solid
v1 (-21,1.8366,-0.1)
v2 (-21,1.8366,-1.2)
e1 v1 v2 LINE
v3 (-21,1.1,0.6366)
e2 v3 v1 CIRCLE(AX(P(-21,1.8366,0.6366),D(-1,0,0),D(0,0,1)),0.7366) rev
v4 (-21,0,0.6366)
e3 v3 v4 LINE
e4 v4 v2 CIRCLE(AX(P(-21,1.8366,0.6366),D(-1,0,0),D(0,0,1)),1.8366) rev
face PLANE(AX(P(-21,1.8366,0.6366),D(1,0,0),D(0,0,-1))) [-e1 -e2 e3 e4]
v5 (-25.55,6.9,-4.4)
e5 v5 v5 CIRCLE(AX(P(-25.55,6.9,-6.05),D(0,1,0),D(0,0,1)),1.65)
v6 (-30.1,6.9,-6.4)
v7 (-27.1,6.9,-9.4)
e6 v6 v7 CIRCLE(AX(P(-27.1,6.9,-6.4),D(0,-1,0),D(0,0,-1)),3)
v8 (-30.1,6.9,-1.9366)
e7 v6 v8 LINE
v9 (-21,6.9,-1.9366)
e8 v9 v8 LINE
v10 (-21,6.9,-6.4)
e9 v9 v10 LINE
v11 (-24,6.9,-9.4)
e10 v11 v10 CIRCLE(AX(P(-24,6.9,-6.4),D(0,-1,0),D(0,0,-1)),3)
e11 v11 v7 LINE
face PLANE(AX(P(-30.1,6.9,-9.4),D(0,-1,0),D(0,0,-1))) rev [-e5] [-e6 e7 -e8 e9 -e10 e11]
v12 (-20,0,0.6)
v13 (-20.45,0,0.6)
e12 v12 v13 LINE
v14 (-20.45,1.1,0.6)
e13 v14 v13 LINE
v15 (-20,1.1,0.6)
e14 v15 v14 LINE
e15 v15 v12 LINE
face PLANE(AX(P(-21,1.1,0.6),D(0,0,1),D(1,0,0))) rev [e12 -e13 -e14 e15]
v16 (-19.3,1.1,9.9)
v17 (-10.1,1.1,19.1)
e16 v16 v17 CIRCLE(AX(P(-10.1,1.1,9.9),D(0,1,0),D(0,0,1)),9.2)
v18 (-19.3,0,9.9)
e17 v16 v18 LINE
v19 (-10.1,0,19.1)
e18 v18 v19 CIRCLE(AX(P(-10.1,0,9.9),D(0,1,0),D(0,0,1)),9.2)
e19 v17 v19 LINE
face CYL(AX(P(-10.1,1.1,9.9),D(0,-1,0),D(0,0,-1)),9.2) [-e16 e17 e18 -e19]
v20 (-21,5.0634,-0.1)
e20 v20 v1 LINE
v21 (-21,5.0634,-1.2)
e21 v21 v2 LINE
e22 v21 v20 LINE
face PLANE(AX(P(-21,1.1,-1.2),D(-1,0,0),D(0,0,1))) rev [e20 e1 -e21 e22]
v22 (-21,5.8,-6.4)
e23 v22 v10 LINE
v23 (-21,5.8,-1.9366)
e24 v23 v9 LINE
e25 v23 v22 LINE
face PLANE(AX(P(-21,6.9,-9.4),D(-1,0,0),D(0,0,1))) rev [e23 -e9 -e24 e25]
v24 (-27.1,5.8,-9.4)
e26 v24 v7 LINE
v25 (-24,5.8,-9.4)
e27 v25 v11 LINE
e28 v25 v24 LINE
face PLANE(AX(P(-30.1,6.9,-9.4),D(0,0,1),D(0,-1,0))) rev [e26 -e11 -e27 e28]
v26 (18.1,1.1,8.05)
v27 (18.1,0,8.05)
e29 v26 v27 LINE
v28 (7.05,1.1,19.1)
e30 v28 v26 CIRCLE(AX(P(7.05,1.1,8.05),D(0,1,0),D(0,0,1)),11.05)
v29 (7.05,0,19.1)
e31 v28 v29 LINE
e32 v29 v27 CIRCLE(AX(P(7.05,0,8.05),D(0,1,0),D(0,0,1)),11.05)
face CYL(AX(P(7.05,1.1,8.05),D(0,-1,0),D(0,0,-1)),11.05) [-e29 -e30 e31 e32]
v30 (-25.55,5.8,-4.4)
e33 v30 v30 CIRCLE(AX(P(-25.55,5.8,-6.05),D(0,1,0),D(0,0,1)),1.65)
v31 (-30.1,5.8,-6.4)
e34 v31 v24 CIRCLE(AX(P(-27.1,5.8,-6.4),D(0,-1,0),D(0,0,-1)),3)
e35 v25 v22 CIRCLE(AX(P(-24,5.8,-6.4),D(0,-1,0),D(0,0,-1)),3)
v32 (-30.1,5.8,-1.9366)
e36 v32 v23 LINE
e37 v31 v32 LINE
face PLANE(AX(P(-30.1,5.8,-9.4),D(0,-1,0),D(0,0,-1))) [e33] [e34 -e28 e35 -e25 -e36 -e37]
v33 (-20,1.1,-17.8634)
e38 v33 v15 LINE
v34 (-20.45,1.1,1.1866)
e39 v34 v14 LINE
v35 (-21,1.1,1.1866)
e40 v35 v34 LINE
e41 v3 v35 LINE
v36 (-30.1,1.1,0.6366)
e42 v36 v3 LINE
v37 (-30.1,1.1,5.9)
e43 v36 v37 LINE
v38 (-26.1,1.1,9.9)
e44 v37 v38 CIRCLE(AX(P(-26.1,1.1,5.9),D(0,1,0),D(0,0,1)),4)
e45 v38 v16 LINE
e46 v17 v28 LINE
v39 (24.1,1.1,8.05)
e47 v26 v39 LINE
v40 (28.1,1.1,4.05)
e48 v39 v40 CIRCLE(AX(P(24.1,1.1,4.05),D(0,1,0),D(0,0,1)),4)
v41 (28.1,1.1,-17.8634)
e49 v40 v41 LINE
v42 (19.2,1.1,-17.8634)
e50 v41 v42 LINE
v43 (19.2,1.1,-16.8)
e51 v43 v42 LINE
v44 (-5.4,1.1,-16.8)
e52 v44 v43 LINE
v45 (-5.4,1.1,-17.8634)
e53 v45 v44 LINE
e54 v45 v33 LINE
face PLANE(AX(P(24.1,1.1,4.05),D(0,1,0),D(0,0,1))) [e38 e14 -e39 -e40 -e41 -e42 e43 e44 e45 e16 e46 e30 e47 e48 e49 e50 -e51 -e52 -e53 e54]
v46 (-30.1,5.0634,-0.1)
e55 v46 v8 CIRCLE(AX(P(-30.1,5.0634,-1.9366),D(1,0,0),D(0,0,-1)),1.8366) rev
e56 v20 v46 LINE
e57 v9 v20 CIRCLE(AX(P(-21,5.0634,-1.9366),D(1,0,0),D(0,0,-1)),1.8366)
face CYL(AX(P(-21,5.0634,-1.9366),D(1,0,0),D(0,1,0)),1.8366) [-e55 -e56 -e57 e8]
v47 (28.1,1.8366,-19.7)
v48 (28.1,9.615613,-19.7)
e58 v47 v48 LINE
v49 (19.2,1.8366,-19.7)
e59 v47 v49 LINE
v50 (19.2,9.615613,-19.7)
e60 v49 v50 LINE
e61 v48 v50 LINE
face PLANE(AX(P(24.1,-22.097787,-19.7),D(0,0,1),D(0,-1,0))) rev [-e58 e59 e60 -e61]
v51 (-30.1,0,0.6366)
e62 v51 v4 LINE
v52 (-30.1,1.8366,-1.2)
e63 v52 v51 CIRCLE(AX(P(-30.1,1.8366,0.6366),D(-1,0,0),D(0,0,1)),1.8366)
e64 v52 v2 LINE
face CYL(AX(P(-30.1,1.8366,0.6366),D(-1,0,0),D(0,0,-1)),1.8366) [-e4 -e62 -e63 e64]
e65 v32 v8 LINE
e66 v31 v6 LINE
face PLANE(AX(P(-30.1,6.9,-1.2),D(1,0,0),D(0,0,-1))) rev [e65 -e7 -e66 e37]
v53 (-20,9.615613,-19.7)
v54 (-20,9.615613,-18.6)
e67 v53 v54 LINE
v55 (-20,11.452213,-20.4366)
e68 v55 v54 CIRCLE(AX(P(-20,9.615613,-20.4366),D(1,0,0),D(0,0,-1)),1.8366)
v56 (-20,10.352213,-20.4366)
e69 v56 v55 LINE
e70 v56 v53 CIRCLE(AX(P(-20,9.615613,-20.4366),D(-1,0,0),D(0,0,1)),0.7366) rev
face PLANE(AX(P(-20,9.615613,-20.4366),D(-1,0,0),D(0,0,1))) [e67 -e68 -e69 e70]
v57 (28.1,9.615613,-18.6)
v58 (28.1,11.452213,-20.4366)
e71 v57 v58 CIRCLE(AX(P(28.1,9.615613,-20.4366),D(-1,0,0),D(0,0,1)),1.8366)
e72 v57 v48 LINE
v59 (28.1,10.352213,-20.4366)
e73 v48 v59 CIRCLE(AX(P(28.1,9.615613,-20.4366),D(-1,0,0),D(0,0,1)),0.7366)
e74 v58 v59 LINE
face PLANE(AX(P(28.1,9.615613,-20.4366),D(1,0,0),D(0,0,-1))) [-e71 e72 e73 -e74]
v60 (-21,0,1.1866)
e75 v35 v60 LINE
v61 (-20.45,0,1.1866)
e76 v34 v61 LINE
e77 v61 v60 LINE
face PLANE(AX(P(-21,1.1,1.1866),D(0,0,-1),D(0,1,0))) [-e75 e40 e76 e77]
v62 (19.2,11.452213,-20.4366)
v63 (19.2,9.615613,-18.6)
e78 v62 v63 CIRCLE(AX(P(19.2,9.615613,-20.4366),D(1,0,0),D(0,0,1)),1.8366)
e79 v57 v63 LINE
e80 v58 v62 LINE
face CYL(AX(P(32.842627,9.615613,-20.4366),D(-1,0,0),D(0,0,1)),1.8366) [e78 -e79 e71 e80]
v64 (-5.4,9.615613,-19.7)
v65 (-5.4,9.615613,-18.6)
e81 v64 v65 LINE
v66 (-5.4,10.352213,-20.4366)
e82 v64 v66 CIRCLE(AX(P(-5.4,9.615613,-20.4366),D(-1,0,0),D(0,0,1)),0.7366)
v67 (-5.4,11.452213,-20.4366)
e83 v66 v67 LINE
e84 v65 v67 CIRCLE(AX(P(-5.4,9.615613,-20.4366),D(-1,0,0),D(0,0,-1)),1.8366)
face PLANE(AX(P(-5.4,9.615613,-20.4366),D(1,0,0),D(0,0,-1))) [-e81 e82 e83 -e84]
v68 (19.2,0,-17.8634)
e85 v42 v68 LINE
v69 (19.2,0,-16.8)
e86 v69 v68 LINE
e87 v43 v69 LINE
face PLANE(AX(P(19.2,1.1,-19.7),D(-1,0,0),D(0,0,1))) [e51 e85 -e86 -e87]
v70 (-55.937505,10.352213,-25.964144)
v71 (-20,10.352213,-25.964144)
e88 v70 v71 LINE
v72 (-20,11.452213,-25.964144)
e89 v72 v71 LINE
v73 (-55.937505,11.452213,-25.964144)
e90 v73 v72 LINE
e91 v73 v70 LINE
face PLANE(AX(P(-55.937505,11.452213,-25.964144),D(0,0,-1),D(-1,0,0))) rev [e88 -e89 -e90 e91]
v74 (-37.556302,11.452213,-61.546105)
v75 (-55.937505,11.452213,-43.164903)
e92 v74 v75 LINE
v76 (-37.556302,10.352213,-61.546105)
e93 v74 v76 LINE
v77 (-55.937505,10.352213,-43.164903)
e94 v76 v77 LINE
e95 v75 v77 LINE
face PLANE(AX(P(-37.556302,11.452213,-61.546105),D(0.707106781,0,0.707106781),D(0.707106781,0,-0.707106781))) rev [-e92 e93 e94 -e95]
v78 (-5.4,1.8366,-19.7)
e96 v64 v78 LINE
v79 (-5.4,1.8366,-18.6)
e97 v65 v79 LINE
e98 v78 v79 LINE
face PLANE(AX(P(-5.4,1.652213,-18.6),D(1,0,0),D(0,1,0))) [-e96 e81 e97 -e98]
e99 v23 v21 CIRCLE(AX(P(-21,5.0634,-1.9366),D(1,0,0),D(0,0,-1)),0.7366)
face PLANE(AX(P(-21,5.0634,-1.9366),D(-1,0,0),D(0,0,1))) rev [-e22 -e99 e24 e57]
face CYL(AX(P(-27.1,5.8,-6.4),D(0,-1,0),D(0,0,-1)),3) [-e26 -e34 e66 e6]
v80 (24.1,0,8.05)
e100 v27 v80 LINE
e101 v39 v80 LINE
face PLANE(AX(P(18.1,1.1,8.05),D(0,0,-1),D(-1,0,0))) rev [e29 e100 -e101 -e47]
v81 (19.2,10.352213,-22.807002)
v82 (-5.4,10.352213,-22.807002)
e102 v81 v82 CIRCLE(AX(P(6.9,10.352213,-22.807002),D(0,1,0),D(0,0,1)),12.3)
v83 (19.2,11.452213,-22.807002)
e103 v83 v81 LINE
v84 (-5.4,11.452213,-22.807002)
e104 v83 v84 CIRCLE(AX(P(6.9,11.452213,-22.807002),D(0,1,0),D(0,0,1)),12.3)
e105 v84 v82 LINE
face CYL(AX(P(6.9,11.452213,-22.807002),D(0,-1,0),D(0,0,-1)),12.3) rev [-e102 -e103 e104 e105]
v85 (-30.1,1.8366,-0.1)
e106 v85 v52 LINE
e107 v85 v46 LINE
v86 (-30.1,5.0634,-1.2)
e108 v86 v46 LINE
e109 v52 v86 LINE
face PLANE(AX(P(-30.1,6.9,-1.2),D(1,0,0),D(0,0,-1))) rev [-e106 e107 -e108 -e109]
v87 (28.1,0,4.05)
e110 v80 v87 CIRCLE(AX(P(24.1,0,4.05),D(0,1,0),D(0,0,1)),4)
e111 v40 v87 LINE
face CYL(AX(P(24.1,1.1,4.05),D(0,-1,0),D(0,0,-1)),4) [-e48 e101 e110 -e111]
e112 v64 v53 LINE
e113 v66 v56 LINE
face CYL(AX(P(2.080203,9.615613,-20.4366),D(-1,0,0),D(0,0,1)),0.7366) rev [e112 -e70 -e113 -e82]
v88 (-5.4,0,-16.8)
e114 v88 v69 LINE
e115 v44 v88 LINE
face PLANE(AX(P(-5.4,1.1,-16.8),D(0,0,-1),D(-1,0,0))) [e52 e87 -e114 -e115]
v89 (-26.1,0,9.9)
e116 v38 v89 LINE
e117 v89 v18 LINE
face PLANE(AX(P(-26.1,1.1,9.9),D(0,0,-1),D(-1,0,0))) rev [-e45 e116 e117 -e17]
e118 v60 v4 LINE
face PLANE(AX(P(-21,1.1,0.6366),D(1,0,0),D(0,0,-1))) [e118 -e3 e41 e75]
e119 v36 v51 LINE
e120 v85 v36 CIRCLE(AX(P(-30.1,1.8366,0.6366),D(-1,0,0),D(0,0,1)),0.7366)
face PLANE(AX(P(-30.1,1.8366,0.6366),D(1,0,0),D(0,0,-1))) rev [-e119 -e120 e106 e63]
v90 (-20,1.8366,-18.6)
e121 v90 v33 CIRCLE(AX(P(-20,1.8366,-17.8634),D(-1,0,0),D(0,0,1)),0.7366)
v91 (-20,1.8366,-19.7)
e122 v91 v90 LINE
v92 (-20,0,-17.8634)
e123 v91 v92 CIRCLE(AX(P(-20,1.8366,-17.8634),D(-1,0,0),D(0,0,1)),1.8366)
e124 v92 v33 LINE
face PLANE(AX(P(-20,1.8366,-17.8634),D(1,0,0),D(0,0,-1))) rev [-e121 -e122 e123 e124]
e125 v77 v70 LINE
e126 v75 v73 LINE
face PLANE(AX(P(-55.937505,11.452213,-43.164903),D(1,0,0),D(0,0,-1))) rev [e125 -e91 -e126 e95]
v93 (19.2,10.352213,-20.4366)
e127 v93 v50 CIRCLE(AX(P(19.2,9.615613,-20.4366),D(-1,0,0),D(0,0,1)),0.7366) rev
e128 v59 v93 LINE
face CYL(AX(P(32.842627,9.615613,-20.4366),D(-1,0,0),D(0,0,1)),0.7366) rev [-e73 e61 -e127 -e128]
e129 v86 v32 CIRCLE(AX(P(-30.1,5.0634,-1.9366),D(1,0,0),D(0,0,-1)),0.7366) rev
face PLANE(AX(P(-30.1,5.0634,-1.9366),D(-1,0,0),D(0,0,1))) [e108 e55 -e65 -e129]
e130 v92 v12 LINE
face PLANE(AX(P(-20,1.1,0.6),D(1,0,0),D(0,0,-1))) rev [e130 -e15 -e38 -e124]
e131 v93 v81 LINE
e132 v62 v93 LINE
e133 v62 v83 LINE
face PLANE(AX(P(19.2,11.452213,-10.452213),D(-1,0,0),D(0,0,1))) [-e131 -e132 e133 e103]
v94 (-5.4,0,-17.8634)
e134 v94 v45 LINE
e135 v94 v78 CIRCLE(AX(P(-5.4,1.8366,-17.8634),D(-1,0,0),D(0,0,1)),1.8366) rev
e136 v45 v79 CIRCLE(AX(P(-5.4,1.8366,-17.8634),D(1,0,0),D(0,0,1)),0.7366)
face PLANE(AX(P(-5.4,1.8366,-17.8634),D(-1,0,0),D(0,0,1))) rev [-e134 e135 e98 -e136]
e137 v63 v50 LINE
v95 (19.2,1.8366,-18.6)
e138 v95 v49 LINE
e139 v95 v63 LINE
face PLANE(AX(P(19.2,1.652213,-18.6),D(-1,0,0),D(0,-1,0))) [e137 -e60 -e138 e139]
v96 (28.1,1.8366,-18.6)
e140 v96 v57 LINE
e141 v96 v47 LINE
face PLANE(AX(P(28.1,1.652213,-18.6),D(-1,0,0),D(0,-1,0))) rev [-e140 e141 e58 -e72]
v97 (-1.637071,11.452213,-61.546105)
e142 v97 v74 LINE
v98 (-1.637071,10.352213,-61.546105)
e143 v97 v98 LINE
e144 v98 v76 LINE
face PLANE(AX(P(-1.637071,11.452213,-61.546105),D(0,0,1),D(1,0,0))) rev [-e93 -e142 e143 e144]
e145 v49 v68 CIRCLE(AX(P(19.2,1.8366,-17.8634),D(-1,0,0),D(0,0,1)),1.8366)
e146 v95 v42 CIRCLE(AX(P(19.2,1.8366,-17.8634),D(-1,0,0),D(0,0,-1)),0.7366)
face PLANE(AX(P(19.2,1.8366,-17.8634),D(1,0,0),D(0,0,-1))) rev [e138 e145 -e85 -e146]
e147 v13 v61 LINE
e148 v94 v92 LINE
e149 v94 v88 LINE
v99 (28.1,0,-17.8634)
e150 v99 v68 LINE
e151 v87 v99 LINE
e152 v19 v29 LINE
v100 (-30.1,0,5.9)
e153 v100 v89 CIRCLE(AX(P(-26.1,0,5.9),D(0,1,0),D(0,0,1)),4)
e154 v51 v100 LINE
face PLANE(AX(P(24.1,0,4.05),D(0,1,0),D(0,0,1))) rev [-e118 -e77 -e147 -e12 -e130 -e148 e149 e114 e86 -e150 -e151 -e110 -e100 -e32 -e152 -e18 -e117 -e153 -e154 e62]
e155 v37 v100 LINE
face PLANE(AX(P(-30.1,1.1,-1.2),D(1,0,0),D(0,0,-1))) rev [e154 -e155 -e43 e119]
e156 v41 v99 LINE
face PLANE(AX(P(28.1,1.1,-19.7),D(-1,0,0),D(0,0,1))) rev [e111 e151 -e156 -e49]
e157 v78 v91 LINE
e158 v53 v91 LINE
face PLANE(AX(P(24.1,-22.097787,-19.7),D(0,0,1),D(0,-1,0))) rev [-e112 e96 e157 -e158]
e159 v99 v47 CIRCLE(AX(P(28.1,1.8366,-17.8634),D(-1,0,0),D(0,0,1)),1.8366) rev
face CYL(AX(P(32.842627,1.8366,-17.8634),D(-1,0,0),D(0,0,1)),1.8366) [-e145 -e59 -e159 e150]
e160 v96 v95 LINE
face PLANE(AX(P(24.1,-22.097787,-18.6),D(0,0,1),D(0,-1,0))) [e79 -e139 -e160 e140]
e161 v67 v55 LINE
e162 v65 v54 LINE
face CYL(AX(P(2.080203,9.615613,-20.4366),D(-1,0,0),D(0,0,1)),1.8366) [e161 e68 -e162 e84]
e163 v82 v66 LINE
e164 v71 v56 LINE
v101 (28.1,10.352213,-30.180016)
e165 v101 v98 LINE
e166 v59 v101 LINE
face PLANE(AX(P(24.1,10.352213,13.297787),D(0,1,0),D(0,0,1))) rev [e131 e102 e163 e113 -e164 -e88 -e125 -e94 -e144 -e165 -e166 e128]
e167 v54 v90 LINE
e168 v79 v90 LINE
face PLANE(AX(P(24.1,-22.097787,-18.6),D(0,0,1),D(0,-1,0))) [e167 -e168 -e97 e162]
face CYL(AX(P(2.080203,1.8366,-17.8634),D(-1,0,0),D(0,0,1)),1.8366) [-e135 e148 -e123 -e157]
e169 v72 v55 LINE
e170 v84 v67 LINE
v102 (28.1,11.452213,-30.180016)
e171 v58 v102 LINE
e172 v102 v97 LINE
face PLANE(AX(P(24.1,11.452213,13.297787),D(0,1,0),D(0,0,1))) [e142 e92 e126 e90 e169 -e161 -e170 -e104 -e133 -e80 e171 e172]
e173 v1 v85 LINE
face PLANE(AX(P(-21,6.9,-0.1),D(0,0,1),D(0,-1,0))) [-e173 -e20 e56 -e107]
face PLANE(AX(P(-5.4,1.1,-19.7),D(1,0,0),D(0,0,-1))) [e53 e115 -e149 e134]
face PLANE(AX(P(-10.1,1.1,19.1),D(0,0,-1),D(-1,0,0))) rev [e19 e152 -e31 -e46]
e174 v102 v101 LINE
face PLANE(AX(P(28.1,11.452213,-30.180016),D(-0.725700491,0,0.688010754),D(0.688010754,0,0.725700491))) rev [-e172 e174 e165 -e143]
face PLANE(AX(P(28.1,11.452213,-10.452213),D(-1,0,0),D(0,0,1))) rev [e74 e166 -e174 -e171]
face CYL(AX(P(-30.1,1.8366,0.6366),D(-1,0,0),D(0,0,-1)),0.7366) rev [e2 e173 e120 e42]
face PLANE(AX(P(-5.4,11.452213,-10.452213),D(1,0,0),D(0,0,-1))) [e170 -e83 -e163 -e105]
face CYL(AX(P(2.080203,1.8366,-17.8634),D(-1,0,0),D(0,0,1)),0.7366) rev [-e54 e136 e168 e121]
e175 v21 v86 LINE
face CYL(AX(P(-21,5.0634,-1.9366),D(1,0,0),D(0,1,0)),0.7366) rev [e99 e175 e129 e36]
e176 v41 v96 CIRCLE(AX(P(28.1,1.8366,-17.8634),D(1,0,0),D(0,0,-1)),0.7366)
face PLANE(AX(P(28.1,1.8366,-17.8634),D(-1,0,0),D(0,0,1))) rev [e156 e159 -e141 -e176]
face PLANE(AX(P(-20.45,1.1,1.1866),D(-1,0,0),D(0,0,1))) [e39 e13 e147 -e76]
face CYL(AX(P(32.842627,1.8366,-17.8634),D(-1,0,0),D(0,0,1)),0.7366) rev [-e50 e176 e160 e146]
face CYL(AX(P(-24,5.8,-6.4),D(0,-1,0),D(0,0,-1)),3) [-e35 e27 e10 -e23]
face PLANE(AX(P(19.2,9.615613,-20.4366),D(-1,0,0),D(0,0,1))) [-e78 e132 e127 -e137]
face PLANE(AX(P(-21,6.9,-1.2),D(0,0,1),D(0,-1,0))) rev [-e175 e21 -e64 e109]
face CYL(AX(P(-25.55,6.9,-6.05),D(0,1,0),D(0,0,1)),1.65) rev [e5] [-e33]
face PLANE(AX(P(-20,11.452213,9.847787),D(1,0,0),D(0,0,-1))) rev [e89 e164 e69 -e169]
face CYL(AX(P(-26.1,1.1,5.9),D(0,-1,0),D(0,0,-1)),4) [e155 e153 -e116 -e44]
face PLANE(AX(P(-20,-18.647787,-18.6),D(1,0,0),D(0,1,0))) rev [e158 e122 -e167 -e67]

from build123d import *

# Parameters (mm, degrees)
BASE_FLANGE1_DEPTH            = 1.1
EDGE_FLANGE1_STRIP_W          = 5.8732
EDGE_FLANGE1_STRIP_H          = 1.1
EDGE_FLANGE1_STRIP_CUT_DEPTH  = 9.1
EDGE_FLANGE1_RELIEF_W         = 6.4232
EDGE_FLANGE1_RELIEF_H         = 0.55
EDGE_FLANGE1_RELIEF_CUT_DEPTH = 1.1
EDGE_FLANGE1_DEPTH            = 9.1
EDGE_FLANGE2_STRIP_W          = 5.8732
EDGE_FLANGE2_STRIP_H          = 1.1
EDGE_FLANGE2_STRIP_CUT_DEPTH  = 9.1
EDGE_FLANGE2_DEPTH            = 9.1
SKETCH9_R                     = 1.65
EXTRUDE1_DEPTH                = 1.1
SKETCHED_START                = -55.937504649
SKETCHED_BEND2_DEPTH          = 84.037504649
SKETCHED_START_2              = -37.556301802
SKETCHED_BEND2_2_OUTLINE_W    = 35.581961475
SKETCHED_BEND2_2_OUTLINE_H    = 1.1
SKETCHED_BEND2_2_DEPTH        = 32.156301802
SKETCHED_START_3              = -20
SKETCHED_BEND2_3_DEPTH        = 14.6
SKETCHED_START_4              = 19.2
SKETCHED_BEND2_4_DEPTH        = 8.9
SKETCHED_START_5              = -19.700000012
SKETCHED_BEND2_5_DEPTH        = 1.100000011
SKETCHED_BEND5_DEPTH          = 84.037504649
SKETCHED_BEND5_2_OUTLINE_W    = 1.1
SKETCHED_BEND5_2_OUTLINE_H    = 35.581961474
SKETCHED_BEND5_2_DEPTH        = 32.156301802
SKETCHED_BEND5_3_DEPTH        = 14.6
SKETCHED_BEND5_4_DEPTH        = 8.9
SKETCHED_START_6              = 10.352213433
SKETCHED_BEND5_5_DEPTH        = 1.1


with BuildPart() as part:
    # Base-Flange1: sheet metal written as solids
    # Sketch1 → Base-Flange1 (new body)
    with BuildSketch(Plane(origin=(0, 0, 0), x_dir=(1, 0, 0), z_dir=(0, 1, 0))):
        with BuildLine():
            Line((-30.1, 1.2), (-21, 1.2))
            Line((-21, 1.2), (-21, -0.6))
            Line((-21, -0.6), (-20, -0.6))
            Line((-20, -0.6), (-20, 19.7))
            Line((-20, 19.7), (-20, 32.054788892))
            Line((-20, 32.054788892), (-20, 35.211930536))
            Line((-20, 35.211930536), (-55.937504649, 35.211930536))
            Line((-55.937504649, 35.211930536), (-55.937504649, 52.412689164))
            Line((-55.937504649, 52.412689164), (-37.556301802, 70.793892011))
            Line((-37.556301802, 70.793892011), (-1.637070551, 70.793892011))
            Line((-1.637070551, 70.793892011), (28.1, 39.427802749))
            Line((28.1, 39.427802749), (28.1, 32.054788892))
            Line((28.1, 32.054788892), (28.1, 19.7))
            Line((28.1, 19.7), (28.1, -4.05))
            ThreePointArc((28.1, -4.05), (26.928427125, -6.878427125), (24.1, -8.05))
            Line((24.1, -8.05), (18.1, -8.05))
            ThreePointArc((18.1, -8.05), (14.863529932, -15.863529932), (7.05, -19.1))
            Line((7.05, -19.1), (-10.1, -19.1))
            ThreePointArc((-10.1, -19.1), (-16.605382387, -16.405382387), (-19.3, -9.9))
            Line((-19.3, -9.9), (-26.1, -9.9))
            ThreePointArc((-26.1, -9.9), (-28.928427125, -8.728427125), (-30.1, -5.9))
            Line((-30.1, -5.9), (-30.1, 1.2))
        make_face()
        with BuildLine():
            Line((-5.4, 19.7), (-5.4, 16.8))
            Line((-5.4, 16.8), (19.2, 16.8))
            Line((19.2, 16.8), (19.2, 19.7))
            Line((19.2, 19.7), (19.2, 32.054788892))
            ThreePointArc((19.2, 32.054788892), (6.9, 44.354788892), (-5.4, 32.054788892))
            Line((-5.4, 32.054788892), (-5.4, 19.7))
        make_face(mode=Mode.SUBTRACT)
    extrude(amount=BASE_FLANGE1_DEPTH)

    # Edge-Flange1: sheet metal written as solids
    # Edge-Flange1 strip (on a plane across the edge) → Edge-Flange1 strip cut (cut)
    with BuildSketch(Plane(origin=(-21, 1.1, -1.2), x_dir=(0, 0, 1), z_dir=(-1, 0, 0))):
        with Locations((-1.1, -0.55)):
            Rectangle(EDGE_FLANGE1_STRIP_W, EDGE_FLANGE1_STRIP_H)
    extrude(amount=EDGE_FLANGE1_STRIP_CUT_DEPTH, mode=Mode.SUBTRACT)

    # Edge-Flange1 relief (on the sheet) → Edge-Flange1 relief cut (cut)
    with BuildSketch(Plane(origin=(-21, 1.1, 0.6366), x_dir=(0, 0, 1), z_dir=(0, 1, 0))):
        with Locations((-2.6616, 0.275)):
            Rectangle(EDGE_FLANGE1_RELIEF_W, EDGE_FLANGE1_RELIEF_H)
    extrude(amount=-EDGE_FLANGE1_RELIEF_CUT_DEPTH, mode=Mode.SUBTRACT)

    # Edge-Flange1 section (on a plane across the edge) → Edge-Flange1 (add)
    with BuildSketch(Plane(origin=(-21, 1.1, -1.2), x_dir=(0, 0, 1), z_dir=(-1, 0, 0))):
        with BuildLine():
            Line((0, 0.7366), (0, 5.8))
            Line((0, 5.8), (1.1, 5.8))
            Line((1.1, 5.8), (1.1, 0.7366))
            ThreePointArc((1.1, 0.7366), (1.315745145, 0.215745145), (1.8366, 0))
            Line((1.8366, 0), (1.8366, -1.1))
            ThreePointArc((1.8366, -1.1), (0.537927686, -0.562072314), (0, 0.7366))
        make_face()
    extrude(amount=EDGE_FLANGE1_DEPTH)

    # Edge-Flange2: sheet metal written as solids
    # Edge-Flange2 strip (on a plane across the edge) → Edge-Flange2 strip cut (cut)
    with BuildSketch(Plane(origin=(-30.1, 6.9, -1.2), x_dir=(0, -1, 0), z_dir=(1, 0, 0))):
        with Locations((-1.1, -0.55)):
            Rectangle(EDGE_FLANGE2_STRIP_W, EDGE_FLANGE2_STRIP_H)
    extrude(amount=EDGE_FLANGE2_STRIP_CUT_DEPTH, mode=Mode.SUBTRACT)

    # Edge-Flange2 section (on a plane across the edge) → Edge-Flange2 (add)
    with BuildSketch(Plane(origin=(-30.1, 6.9, -1.2), x_dir=(0, -1, 0), z_dir=(1, 0, 0))):
        with BuildLine():
            Line((0, 0.7366), (0, 8.2))
            Line((0, 8.2), (1.1, 8.2))
            Line((1.1, 8.2), (1.1, 0.7366))
            ThreePointArc((1.1, 0.7366), (1.315745145, 0.215745145), (1.8366, 0))
            Line((1.8366, 0), (1.8366, -1.1))
            ThreePointArc((1.8366, -1.1), (0.537927686, -0.562072314), (0, 0.7366))
        make_face()
    extrude(amount=EDGE_FLANGE2_DEPTH)

    # Sketch9 → Extrude1 (cut)
    with BuildSketch(Plane(origin=(0, 6.9, 0), x_dir=(1, 0, 0), z_dir=(0, 1, 0))):
        with Locations(Location((-25.55, 6.05, 0), (0, 0, 270))):
            Circle(SKETCH9_R)
        with BuildLine():
            Line((-30.1, 6.4), (-30.1, 9.4))
            Line((-30.1, 9.4), (-27.1, 9.4))
            ThreePointArc((-27.1, 9.4), (-29.221320344, 8.521320344), (-30.1, 6.4))
        make_face()
        with BuildLine():
            Line((-24, 9.4), (-21, 9.4))
            Line((-21, 9.4), (-21, 6.4))
            ThreePointArc((-21, 6.4), (-21.878679656, 8.521320344), (-24, 9.4))
        make_face()
    extrude(amount=-EXTRUDE1_DEPTH, mode=Mode.SUBTRACT)

    # Sketched Bend2: read off the stored shape, not the designer's step
    # Sketched Bend2 outline → Sketched Bend2 (cut)
    with BuildSketch(Plane.YZ.offset(SKETCHED_START)):
        with BuildLine():
            ThreePointArc((1.1, -19.545814945), (0.299404636, -18.868452246), (-1.3e-08, -17.8634))
            Line((-1.3e-08, -17.8634), (0, -70.793892011))
            Line((0, -70.793892011), (1.1, -70.793892011))
            Line((1.1, -70.793892011), (1.1, -19.545814945))
        make_face()
    extrude(amount=SKETCHED_BEND2_DEPTH, mode=Mode.SUBTRACT)



with BuildPart() as body_2:
    # Sketched Bend2 2 outline → Sketched Bend2 2 (new body)
    with BuildSketch(Plane.YZ.offset(SKETCHED_START_2)):
        with Locations((34.95512472, -19.15)):
            Rectangle(SKETCHED_BEND2_2_OUTLINE_W, SKETCHED_BEND2_2_OUTLINE_H)
    extrude(amount=SKETCHED_BEND2_2_DEPTH)


with BuildPart() as part_1:
    add(part.part)

    add(body_2.part)  # Sketched Bend2 3 merges body 2
    # Sketched Bend2 3 outline → Sketched Bend2 3 (add)
    with BuildSketch(Plane.YZ.offset(SKETCHED_START_3)):
        with BuildLine():
            Line((17.164143982, -18.6), (1.836600013, -18.600000013))
            ThreePointArc((1.836600013, -18.600000013), (1.315745141, -18.384254868), (1.099999987, -17.8634))
            Line((1.099999987, -17.8634), (1.1, -19.545814945))
            ThreePointArc((1.1, -19.545814945), (1.460317993, -19.661040525), (1.8366, -19.700000013))
            Line((1.8366, -19.700000013), (17.164143982, -19.7))
            Line((17.164143982, -19.7), (17.164143982, -18.6))
        make_face()
    extrude(amount=SKETCHED_BEND2_3_DEPTH)

    # Sketched Bend2 4 outline → Sketched Bend2 4 (add)
    with BuildSketch(Plane.YZ.offset(SKETCHED_START_4)):
        with BuildLine():
            Line((17.164143982, -18.6), (1.836600013, -18.600000013))
            ThreePointArc((1.836600013, -18.600000013), (1.315745141, -18.384254868), (1.099999987, -17.8634))
            Line((1.099999987, -17.8634), (1.1, -19.545814945))
            ThreePointArc((1.1, -19.545814945), (1.460317993, -19.661040525), (1.8366, -19.700000013))
            Line((1.8366, -19.700000013), (17.164143982, -19.7))
            Line((17.164143982, -19.7), (17.164143982, -18.6))
        make_face()
    extrude(amount=SKETCHED_BEND2_4_DEPTH)

    # Sketched Bend2 5 outline → Sketched Bend2 5 (add)
    with BuildSketch(Plane.XY.offset(SKETCHED_START_5)):
        Polygon((-37.556301802, 17.164143982), (-37.556301802, 52.746105457), (-55.937504649, 34.36490261), (-55.937504649, 17.164143982), align=None)
        with BuildLine():
            Line((28.1, 17.164143982), (28.1, 21.380016195))
            Line((28.1, 21.380016195), (-1.637070551, 52.746105457))
            Line((-1.637070551, 52.746105457), (-5.4, 52.746105457))
            Line((-5.4, 52.746105457), (-5.4, 14.007002338))
            ThreePointArc((-5.4, 14.007002338), (6.9, 26.307002338), (19.2, 14.007002338))
            Line((19.2, 14.007002338), (19.2, 17.164143982))
            Line((19.2, 17.164143982), (28.1, 17.164143982))
        make_face()
    extrude(amount=SKETCHED_BEND2_5_DEPTH)

    # Sketched Bend5: read off the stored shape, not the designer's step
    # Sketched Bend5 outline → Sketched Bend5 (cut)
    with BuildSketch(Plane.YZ.offset(SKETCHED_START)):
        with BuildLine():
            ThreePointArc((9.615613433, -18.599999993), (10.620665676, -18.89940464), (11.298028372, -19.7))
            Line((11.298028372, -19.7), (52.746105457, -19.7))
            Line((52.746105457, -19.7), (52.746105457, -18.6))
            Line((52.746105457, -18.6), (9.615613433, -18.599999993))
        make_face()
    extrude(amount=SKETCHED_BEND5_DEPTH, mode=Mode.SUBTRACT)



with BuildPart() as body_2_2:
    # Sketched Bend5 2 outline → Sketched Bend5 2 (new body)
    with BuildSketch(Plane.YZ.offset(SKETCHED_START_2)):
        with Locations((10.902213433, -43.755124732)):
            Rectangle(SKETCHED_BEND5_2_OUTLINE_W, SKETCHED_BEND5_2_OUTLINE_H)
    extrude(amount=SKETCHED_BEND5_2_DEPTH)


with BuildPart() as part_2:
    add(part_1.part)

    add(body_2_2.part)  # Sketched Bend5 3 merges body 2 2
    # Sketched Bend5 3 outline → Sketched Bend5 3 (add)
    with BuildSketch(Plane.YZ.offset(SKETCHED_START_3)):
        with BuildLine():
            ThreePointArc((11.45221344, -20.4366), (11.413253953, -20.060317993), (11.298028372, -19.7))
            Line((11.298028372, -19.7), (9.615613433, -19.699999993))
            ThreePointArc((9.615613433, -19.699999993), (10.136468293, -19.91574514), (10.35221344, -20.4366))
            Line((10.35221344, -20.4366), (10.352213433, -25.964143995))
            Line((10.352213433, -25.964143995), (11.452213433, -25.964143995))
            Line((11.452213433, -25.964143995), (11.45221344, -20.4366))
        make_face()
    extrude(amount=SKETCHED_BEND5_3_DEPTH)

    # Sketched Bend5 4 outline → Sketched Bend5 4 (add)
    with BuildSketch(Plane.YZ.offset(SKETCHED_START_4)):
        with BuildLine():
            ThreePointArc((11.45221344, -20.4366), (11.413253953, -20.060317993), (11.298028372, -19.7))
            Line((11.298028372, -19.7), (9.615613433, -19.699999993))
            ThreePointArc((9.615613433, -19.699999993), (10.136468293, -19.91574514), (10.35221344, -20.4366))
            Line((10.35221344, -20.4366), (10.352213433, -25.964143995))
            Line((10.352213433, -25.964143995), (11.452213433, -25.964143995))
            Line((11.452213433, -25.964143995), (11.45221344, -20.4366))
        make_face()
    extrude(amount=SKETCHED_BEND5_4_DEPTH)

    # Sketched Bend5 5 outline → Sketched Bend5 5 (add)
    with BuildSketch(Plane(origin=(0, 0, 0), x_dir=(1, 0, 0), z_dir=(0, 1, 0)).offset(SKETCHED_START_6)):
        Polygon((-37.556301802, 25.964143995), (-37.556301802, 61.546105469), (-55.937504649, 43.164902622), (-55.937504649, 25.964143995), align=None)
        with BuildLine():
            Line((28.1, 25.964143995), (28.1, 30.180016207))
            Line((28.1, 30.180016207), (-1.637070551, 61.546105469))
            Line((-1.637070551, 61.546105469), (-5.4, 61.546105469))
            Line((-5.4, 61.546105469), (-5.4, 22.80700235))
            ThreePointArc((-5.4, 22.80700235), (6.9, 35.10700235), (19.2, 22.80700235))
            Line((19.2, 22.80700235), (19.2, 25.964143995))
            Line((19.2, 25.964143995), (28.1, 25.964143995))
        make_face()
    extrude(amount=SKETCHED_BEND5_5_DEPTH)


solid = part_2.part
